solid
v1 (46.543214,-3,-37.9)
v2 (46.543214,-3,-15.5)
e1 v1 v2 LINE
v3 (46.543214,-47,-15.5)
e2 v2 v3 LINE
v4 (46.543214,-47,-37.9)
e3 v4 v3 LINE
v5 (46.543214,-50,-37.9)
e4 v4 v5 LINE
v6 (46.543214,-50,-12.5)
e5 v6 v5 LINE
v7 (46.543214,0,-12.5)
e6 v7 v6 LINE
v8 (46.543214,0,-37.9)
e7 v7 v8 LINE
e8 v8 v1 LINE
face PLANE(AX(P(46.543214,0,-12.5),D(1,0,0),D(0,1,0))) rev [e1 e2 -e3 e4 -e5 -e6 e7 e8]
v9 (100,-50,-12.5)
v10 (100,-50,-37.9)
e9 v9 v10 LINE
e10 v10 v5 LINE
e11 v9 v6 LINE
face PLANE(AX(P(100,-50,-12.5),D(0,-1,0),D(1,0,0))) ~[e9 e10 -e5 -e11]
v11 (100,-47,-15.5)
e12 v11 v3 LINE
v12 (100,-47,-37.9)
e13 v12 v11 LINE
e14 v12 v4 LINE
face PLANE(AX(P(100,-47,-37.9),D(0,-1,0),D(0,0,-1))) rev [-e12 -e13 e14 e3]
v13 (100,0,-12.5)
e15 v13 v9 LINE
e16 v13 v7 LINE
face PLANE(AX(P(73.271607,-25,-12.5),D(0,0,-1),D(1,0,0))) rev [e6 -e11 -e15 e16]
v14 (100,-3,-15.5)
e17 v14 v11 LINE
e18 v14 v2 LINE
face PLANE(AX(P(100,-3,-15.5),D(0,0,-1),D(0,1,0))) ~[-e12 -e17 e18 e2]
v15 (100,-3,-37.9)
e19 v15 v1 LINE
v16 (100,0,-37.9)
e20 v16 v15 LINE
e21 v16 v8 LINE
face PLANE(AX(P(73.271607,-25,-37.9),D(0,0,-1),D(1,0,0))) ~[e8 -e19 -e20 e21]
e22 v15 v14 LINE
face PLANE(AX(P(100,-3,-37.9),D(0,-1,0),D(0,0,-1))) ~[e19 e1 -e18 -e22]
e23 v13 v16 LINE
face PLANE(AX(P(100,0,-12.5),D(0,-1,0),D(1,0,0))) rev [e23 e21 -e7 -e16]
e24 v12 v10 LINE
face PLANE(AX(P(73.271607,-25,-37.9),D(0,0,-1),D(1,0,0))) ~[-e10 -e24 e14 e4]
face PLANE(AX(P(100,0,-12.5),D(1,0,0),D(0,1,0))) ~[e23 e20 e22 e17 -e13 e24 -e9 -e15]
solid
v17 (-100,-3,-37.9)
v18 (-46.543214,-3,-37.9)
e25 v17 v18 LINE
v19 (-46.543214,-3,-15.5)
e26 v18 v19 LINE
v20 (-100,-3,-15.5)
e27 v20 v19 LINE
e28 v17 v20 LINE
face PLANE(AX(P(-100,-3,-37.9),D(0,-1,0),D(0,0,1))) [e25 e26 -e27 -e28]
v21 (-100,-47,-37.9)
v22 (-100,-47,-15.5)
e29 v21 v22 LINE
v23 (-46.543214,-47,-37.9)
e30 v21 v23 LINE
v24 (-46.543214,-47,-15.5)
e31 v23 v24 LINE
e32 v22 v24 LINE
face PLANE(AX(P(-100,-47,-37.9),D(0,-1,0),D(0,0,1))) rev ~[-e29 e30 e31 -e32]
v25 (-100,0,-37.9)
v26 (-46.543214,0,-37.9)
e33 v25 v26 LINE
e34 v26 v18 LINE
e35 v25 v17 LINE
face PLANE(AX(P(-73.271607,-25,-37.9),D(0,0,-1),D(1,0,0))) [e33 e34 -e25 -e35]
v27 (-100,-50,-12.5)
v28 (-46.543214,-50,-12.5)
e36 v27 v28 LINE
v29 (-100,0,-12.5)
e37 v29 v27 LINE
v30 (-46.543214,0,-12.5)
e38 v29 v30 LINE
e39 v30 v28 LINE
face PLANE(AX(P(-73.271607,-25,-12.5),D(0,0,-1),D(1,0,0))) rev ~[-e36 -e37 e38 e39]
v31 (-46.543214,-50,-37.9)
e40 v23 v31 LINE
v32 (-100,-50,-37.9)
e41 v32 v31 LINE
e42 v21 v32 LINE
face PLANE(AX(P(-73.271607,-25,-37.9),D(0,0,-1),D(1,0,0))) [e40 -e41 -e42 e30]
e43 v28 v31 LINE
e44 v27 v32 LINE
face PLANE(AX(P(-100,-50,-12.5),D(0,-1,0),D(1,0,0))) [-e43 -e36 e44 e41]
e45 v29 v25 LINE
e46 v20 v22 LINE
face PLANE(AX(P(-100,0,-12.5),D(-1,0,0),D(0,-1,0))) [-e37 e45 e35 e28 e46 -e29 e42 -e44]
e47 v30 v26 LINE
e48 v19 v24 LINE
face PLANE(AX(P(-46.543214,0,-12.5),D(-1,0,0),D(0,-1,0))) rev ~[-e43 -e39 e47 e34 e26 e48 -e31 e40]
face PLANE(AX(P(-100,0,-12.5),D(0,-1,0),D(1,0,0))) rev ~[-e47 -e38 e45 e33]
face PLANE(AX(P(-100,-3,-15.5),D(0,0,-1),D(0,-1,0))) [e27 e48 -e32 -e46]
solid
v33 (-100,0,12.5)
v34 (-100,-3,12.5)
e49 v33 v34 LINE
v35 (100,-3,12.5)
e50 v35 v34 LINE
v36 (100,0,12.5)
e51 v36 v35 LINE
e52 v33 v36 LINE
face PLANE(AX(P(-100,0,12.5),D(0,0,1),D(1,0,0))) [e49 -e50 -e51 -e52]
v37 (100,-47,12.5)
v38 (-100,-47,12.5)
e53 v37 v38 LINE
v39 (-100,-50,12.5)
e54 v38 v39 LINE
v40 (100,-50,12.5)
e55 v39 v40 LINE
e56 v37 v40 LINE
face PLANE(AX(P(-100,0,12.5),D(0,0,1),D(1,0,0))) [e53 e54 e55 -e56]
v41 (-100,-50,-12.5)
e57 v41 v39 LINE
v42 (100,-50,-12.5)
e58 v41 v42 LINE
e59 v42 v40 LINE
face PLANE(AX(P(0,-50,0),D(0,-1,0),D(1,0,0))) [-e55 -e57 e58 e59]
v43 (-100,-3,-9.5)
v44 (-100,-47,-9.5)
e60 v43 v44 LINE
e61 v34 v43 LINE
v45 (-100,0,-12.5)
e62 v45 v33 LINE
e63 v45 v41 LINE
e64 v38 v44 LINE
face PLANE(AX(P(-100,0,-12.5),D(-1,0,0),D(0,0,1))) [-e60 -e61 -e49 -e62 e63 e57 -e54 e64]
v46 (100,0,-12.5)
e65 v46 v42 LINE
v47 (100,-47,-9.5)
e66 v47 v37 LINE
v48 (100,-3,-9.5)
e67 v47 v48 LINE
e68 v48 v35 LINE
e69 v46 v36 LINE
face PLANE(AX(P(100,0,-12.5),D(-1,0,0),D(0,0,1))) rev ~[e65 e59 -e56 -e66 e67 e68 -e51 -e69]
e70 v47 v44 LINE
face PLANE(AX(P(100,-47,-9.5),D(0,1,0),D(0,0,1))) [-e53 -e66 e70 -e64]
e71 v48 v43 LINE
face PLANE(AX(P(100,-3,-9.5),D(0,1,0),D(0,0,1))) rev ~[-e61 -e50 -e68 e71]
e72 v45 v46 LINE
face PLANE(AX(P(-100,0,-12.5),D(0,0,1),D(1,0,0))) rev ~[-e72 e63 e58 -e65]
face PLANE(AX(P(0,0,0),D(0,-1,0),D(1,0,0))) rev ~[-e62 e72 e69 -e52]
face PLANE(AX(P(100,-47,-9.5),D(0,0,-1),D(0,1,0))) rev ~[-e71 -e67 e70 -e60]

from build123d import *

# Parameters (mm, degrees)
F0_W     = 200
F0_H     = 25
F1_DEPTH = 50
F2_W     = 44
F2_H     = 22
F3_DEPTH = 200.001
F4_W     = 53.4567855299
F4_H     = 50
F5_DEPTH = 25.4
F6_W     = 44
F6_H     = 22.4
F7_DEPTH = 200.001


# Not quite as in the source:
# - a feature names something its author has since deleted; it is built from what else it names


with BuildPart() as f1:
    # F0 (on Front) → F1 (new body)
    with BuildSketch(Plane.XZ):
        Rectangle(F0_W, F0_H)
    extrude(amount=F1_DEPTH)

    # F2 (on face) → F3 (cut, through all)
    with BuildSketch(Plane.YZ.offset(100)):
        with Locations((-25, 1.5)):
            Rectangle(F2_W, F2_H)
    extrude(amount=-F3_DEPTH, mode=Mode.SUBTRACT)


with BuildPart() as f5:
    # F4 (on face) → F5 (new body)
    with BuildSketch(Plane(origin=(0, 0, -12.5), x_dir=(1, 0, 0), z_dir=(0, 0, -1))):
        with Locations((-73.2716072351, 25)):
            Rectangle(F4_W, F4_H)
    extrude(amount=F5_DEPTH)

    # F6 (on face) → F7 (cut, through all)
    with BuildSketch(Plane(origin=(-100, 0, 0), x_dir=(0, -1, 0), z_dir=(-1, 0, 0))):
        with Locations((25, -26.7)):
            Rectangle(F6_W, F6_H)
    extrude(amount=-F7_DEPTH, mode=Mode.SUBTRACT)


with BuildPart() as f8_1:
    # F8: instance of F5
    add(f5.part.mirror(Plane.YZ))


solid = Compound([f1.part, f5.part, f8_1.part])
